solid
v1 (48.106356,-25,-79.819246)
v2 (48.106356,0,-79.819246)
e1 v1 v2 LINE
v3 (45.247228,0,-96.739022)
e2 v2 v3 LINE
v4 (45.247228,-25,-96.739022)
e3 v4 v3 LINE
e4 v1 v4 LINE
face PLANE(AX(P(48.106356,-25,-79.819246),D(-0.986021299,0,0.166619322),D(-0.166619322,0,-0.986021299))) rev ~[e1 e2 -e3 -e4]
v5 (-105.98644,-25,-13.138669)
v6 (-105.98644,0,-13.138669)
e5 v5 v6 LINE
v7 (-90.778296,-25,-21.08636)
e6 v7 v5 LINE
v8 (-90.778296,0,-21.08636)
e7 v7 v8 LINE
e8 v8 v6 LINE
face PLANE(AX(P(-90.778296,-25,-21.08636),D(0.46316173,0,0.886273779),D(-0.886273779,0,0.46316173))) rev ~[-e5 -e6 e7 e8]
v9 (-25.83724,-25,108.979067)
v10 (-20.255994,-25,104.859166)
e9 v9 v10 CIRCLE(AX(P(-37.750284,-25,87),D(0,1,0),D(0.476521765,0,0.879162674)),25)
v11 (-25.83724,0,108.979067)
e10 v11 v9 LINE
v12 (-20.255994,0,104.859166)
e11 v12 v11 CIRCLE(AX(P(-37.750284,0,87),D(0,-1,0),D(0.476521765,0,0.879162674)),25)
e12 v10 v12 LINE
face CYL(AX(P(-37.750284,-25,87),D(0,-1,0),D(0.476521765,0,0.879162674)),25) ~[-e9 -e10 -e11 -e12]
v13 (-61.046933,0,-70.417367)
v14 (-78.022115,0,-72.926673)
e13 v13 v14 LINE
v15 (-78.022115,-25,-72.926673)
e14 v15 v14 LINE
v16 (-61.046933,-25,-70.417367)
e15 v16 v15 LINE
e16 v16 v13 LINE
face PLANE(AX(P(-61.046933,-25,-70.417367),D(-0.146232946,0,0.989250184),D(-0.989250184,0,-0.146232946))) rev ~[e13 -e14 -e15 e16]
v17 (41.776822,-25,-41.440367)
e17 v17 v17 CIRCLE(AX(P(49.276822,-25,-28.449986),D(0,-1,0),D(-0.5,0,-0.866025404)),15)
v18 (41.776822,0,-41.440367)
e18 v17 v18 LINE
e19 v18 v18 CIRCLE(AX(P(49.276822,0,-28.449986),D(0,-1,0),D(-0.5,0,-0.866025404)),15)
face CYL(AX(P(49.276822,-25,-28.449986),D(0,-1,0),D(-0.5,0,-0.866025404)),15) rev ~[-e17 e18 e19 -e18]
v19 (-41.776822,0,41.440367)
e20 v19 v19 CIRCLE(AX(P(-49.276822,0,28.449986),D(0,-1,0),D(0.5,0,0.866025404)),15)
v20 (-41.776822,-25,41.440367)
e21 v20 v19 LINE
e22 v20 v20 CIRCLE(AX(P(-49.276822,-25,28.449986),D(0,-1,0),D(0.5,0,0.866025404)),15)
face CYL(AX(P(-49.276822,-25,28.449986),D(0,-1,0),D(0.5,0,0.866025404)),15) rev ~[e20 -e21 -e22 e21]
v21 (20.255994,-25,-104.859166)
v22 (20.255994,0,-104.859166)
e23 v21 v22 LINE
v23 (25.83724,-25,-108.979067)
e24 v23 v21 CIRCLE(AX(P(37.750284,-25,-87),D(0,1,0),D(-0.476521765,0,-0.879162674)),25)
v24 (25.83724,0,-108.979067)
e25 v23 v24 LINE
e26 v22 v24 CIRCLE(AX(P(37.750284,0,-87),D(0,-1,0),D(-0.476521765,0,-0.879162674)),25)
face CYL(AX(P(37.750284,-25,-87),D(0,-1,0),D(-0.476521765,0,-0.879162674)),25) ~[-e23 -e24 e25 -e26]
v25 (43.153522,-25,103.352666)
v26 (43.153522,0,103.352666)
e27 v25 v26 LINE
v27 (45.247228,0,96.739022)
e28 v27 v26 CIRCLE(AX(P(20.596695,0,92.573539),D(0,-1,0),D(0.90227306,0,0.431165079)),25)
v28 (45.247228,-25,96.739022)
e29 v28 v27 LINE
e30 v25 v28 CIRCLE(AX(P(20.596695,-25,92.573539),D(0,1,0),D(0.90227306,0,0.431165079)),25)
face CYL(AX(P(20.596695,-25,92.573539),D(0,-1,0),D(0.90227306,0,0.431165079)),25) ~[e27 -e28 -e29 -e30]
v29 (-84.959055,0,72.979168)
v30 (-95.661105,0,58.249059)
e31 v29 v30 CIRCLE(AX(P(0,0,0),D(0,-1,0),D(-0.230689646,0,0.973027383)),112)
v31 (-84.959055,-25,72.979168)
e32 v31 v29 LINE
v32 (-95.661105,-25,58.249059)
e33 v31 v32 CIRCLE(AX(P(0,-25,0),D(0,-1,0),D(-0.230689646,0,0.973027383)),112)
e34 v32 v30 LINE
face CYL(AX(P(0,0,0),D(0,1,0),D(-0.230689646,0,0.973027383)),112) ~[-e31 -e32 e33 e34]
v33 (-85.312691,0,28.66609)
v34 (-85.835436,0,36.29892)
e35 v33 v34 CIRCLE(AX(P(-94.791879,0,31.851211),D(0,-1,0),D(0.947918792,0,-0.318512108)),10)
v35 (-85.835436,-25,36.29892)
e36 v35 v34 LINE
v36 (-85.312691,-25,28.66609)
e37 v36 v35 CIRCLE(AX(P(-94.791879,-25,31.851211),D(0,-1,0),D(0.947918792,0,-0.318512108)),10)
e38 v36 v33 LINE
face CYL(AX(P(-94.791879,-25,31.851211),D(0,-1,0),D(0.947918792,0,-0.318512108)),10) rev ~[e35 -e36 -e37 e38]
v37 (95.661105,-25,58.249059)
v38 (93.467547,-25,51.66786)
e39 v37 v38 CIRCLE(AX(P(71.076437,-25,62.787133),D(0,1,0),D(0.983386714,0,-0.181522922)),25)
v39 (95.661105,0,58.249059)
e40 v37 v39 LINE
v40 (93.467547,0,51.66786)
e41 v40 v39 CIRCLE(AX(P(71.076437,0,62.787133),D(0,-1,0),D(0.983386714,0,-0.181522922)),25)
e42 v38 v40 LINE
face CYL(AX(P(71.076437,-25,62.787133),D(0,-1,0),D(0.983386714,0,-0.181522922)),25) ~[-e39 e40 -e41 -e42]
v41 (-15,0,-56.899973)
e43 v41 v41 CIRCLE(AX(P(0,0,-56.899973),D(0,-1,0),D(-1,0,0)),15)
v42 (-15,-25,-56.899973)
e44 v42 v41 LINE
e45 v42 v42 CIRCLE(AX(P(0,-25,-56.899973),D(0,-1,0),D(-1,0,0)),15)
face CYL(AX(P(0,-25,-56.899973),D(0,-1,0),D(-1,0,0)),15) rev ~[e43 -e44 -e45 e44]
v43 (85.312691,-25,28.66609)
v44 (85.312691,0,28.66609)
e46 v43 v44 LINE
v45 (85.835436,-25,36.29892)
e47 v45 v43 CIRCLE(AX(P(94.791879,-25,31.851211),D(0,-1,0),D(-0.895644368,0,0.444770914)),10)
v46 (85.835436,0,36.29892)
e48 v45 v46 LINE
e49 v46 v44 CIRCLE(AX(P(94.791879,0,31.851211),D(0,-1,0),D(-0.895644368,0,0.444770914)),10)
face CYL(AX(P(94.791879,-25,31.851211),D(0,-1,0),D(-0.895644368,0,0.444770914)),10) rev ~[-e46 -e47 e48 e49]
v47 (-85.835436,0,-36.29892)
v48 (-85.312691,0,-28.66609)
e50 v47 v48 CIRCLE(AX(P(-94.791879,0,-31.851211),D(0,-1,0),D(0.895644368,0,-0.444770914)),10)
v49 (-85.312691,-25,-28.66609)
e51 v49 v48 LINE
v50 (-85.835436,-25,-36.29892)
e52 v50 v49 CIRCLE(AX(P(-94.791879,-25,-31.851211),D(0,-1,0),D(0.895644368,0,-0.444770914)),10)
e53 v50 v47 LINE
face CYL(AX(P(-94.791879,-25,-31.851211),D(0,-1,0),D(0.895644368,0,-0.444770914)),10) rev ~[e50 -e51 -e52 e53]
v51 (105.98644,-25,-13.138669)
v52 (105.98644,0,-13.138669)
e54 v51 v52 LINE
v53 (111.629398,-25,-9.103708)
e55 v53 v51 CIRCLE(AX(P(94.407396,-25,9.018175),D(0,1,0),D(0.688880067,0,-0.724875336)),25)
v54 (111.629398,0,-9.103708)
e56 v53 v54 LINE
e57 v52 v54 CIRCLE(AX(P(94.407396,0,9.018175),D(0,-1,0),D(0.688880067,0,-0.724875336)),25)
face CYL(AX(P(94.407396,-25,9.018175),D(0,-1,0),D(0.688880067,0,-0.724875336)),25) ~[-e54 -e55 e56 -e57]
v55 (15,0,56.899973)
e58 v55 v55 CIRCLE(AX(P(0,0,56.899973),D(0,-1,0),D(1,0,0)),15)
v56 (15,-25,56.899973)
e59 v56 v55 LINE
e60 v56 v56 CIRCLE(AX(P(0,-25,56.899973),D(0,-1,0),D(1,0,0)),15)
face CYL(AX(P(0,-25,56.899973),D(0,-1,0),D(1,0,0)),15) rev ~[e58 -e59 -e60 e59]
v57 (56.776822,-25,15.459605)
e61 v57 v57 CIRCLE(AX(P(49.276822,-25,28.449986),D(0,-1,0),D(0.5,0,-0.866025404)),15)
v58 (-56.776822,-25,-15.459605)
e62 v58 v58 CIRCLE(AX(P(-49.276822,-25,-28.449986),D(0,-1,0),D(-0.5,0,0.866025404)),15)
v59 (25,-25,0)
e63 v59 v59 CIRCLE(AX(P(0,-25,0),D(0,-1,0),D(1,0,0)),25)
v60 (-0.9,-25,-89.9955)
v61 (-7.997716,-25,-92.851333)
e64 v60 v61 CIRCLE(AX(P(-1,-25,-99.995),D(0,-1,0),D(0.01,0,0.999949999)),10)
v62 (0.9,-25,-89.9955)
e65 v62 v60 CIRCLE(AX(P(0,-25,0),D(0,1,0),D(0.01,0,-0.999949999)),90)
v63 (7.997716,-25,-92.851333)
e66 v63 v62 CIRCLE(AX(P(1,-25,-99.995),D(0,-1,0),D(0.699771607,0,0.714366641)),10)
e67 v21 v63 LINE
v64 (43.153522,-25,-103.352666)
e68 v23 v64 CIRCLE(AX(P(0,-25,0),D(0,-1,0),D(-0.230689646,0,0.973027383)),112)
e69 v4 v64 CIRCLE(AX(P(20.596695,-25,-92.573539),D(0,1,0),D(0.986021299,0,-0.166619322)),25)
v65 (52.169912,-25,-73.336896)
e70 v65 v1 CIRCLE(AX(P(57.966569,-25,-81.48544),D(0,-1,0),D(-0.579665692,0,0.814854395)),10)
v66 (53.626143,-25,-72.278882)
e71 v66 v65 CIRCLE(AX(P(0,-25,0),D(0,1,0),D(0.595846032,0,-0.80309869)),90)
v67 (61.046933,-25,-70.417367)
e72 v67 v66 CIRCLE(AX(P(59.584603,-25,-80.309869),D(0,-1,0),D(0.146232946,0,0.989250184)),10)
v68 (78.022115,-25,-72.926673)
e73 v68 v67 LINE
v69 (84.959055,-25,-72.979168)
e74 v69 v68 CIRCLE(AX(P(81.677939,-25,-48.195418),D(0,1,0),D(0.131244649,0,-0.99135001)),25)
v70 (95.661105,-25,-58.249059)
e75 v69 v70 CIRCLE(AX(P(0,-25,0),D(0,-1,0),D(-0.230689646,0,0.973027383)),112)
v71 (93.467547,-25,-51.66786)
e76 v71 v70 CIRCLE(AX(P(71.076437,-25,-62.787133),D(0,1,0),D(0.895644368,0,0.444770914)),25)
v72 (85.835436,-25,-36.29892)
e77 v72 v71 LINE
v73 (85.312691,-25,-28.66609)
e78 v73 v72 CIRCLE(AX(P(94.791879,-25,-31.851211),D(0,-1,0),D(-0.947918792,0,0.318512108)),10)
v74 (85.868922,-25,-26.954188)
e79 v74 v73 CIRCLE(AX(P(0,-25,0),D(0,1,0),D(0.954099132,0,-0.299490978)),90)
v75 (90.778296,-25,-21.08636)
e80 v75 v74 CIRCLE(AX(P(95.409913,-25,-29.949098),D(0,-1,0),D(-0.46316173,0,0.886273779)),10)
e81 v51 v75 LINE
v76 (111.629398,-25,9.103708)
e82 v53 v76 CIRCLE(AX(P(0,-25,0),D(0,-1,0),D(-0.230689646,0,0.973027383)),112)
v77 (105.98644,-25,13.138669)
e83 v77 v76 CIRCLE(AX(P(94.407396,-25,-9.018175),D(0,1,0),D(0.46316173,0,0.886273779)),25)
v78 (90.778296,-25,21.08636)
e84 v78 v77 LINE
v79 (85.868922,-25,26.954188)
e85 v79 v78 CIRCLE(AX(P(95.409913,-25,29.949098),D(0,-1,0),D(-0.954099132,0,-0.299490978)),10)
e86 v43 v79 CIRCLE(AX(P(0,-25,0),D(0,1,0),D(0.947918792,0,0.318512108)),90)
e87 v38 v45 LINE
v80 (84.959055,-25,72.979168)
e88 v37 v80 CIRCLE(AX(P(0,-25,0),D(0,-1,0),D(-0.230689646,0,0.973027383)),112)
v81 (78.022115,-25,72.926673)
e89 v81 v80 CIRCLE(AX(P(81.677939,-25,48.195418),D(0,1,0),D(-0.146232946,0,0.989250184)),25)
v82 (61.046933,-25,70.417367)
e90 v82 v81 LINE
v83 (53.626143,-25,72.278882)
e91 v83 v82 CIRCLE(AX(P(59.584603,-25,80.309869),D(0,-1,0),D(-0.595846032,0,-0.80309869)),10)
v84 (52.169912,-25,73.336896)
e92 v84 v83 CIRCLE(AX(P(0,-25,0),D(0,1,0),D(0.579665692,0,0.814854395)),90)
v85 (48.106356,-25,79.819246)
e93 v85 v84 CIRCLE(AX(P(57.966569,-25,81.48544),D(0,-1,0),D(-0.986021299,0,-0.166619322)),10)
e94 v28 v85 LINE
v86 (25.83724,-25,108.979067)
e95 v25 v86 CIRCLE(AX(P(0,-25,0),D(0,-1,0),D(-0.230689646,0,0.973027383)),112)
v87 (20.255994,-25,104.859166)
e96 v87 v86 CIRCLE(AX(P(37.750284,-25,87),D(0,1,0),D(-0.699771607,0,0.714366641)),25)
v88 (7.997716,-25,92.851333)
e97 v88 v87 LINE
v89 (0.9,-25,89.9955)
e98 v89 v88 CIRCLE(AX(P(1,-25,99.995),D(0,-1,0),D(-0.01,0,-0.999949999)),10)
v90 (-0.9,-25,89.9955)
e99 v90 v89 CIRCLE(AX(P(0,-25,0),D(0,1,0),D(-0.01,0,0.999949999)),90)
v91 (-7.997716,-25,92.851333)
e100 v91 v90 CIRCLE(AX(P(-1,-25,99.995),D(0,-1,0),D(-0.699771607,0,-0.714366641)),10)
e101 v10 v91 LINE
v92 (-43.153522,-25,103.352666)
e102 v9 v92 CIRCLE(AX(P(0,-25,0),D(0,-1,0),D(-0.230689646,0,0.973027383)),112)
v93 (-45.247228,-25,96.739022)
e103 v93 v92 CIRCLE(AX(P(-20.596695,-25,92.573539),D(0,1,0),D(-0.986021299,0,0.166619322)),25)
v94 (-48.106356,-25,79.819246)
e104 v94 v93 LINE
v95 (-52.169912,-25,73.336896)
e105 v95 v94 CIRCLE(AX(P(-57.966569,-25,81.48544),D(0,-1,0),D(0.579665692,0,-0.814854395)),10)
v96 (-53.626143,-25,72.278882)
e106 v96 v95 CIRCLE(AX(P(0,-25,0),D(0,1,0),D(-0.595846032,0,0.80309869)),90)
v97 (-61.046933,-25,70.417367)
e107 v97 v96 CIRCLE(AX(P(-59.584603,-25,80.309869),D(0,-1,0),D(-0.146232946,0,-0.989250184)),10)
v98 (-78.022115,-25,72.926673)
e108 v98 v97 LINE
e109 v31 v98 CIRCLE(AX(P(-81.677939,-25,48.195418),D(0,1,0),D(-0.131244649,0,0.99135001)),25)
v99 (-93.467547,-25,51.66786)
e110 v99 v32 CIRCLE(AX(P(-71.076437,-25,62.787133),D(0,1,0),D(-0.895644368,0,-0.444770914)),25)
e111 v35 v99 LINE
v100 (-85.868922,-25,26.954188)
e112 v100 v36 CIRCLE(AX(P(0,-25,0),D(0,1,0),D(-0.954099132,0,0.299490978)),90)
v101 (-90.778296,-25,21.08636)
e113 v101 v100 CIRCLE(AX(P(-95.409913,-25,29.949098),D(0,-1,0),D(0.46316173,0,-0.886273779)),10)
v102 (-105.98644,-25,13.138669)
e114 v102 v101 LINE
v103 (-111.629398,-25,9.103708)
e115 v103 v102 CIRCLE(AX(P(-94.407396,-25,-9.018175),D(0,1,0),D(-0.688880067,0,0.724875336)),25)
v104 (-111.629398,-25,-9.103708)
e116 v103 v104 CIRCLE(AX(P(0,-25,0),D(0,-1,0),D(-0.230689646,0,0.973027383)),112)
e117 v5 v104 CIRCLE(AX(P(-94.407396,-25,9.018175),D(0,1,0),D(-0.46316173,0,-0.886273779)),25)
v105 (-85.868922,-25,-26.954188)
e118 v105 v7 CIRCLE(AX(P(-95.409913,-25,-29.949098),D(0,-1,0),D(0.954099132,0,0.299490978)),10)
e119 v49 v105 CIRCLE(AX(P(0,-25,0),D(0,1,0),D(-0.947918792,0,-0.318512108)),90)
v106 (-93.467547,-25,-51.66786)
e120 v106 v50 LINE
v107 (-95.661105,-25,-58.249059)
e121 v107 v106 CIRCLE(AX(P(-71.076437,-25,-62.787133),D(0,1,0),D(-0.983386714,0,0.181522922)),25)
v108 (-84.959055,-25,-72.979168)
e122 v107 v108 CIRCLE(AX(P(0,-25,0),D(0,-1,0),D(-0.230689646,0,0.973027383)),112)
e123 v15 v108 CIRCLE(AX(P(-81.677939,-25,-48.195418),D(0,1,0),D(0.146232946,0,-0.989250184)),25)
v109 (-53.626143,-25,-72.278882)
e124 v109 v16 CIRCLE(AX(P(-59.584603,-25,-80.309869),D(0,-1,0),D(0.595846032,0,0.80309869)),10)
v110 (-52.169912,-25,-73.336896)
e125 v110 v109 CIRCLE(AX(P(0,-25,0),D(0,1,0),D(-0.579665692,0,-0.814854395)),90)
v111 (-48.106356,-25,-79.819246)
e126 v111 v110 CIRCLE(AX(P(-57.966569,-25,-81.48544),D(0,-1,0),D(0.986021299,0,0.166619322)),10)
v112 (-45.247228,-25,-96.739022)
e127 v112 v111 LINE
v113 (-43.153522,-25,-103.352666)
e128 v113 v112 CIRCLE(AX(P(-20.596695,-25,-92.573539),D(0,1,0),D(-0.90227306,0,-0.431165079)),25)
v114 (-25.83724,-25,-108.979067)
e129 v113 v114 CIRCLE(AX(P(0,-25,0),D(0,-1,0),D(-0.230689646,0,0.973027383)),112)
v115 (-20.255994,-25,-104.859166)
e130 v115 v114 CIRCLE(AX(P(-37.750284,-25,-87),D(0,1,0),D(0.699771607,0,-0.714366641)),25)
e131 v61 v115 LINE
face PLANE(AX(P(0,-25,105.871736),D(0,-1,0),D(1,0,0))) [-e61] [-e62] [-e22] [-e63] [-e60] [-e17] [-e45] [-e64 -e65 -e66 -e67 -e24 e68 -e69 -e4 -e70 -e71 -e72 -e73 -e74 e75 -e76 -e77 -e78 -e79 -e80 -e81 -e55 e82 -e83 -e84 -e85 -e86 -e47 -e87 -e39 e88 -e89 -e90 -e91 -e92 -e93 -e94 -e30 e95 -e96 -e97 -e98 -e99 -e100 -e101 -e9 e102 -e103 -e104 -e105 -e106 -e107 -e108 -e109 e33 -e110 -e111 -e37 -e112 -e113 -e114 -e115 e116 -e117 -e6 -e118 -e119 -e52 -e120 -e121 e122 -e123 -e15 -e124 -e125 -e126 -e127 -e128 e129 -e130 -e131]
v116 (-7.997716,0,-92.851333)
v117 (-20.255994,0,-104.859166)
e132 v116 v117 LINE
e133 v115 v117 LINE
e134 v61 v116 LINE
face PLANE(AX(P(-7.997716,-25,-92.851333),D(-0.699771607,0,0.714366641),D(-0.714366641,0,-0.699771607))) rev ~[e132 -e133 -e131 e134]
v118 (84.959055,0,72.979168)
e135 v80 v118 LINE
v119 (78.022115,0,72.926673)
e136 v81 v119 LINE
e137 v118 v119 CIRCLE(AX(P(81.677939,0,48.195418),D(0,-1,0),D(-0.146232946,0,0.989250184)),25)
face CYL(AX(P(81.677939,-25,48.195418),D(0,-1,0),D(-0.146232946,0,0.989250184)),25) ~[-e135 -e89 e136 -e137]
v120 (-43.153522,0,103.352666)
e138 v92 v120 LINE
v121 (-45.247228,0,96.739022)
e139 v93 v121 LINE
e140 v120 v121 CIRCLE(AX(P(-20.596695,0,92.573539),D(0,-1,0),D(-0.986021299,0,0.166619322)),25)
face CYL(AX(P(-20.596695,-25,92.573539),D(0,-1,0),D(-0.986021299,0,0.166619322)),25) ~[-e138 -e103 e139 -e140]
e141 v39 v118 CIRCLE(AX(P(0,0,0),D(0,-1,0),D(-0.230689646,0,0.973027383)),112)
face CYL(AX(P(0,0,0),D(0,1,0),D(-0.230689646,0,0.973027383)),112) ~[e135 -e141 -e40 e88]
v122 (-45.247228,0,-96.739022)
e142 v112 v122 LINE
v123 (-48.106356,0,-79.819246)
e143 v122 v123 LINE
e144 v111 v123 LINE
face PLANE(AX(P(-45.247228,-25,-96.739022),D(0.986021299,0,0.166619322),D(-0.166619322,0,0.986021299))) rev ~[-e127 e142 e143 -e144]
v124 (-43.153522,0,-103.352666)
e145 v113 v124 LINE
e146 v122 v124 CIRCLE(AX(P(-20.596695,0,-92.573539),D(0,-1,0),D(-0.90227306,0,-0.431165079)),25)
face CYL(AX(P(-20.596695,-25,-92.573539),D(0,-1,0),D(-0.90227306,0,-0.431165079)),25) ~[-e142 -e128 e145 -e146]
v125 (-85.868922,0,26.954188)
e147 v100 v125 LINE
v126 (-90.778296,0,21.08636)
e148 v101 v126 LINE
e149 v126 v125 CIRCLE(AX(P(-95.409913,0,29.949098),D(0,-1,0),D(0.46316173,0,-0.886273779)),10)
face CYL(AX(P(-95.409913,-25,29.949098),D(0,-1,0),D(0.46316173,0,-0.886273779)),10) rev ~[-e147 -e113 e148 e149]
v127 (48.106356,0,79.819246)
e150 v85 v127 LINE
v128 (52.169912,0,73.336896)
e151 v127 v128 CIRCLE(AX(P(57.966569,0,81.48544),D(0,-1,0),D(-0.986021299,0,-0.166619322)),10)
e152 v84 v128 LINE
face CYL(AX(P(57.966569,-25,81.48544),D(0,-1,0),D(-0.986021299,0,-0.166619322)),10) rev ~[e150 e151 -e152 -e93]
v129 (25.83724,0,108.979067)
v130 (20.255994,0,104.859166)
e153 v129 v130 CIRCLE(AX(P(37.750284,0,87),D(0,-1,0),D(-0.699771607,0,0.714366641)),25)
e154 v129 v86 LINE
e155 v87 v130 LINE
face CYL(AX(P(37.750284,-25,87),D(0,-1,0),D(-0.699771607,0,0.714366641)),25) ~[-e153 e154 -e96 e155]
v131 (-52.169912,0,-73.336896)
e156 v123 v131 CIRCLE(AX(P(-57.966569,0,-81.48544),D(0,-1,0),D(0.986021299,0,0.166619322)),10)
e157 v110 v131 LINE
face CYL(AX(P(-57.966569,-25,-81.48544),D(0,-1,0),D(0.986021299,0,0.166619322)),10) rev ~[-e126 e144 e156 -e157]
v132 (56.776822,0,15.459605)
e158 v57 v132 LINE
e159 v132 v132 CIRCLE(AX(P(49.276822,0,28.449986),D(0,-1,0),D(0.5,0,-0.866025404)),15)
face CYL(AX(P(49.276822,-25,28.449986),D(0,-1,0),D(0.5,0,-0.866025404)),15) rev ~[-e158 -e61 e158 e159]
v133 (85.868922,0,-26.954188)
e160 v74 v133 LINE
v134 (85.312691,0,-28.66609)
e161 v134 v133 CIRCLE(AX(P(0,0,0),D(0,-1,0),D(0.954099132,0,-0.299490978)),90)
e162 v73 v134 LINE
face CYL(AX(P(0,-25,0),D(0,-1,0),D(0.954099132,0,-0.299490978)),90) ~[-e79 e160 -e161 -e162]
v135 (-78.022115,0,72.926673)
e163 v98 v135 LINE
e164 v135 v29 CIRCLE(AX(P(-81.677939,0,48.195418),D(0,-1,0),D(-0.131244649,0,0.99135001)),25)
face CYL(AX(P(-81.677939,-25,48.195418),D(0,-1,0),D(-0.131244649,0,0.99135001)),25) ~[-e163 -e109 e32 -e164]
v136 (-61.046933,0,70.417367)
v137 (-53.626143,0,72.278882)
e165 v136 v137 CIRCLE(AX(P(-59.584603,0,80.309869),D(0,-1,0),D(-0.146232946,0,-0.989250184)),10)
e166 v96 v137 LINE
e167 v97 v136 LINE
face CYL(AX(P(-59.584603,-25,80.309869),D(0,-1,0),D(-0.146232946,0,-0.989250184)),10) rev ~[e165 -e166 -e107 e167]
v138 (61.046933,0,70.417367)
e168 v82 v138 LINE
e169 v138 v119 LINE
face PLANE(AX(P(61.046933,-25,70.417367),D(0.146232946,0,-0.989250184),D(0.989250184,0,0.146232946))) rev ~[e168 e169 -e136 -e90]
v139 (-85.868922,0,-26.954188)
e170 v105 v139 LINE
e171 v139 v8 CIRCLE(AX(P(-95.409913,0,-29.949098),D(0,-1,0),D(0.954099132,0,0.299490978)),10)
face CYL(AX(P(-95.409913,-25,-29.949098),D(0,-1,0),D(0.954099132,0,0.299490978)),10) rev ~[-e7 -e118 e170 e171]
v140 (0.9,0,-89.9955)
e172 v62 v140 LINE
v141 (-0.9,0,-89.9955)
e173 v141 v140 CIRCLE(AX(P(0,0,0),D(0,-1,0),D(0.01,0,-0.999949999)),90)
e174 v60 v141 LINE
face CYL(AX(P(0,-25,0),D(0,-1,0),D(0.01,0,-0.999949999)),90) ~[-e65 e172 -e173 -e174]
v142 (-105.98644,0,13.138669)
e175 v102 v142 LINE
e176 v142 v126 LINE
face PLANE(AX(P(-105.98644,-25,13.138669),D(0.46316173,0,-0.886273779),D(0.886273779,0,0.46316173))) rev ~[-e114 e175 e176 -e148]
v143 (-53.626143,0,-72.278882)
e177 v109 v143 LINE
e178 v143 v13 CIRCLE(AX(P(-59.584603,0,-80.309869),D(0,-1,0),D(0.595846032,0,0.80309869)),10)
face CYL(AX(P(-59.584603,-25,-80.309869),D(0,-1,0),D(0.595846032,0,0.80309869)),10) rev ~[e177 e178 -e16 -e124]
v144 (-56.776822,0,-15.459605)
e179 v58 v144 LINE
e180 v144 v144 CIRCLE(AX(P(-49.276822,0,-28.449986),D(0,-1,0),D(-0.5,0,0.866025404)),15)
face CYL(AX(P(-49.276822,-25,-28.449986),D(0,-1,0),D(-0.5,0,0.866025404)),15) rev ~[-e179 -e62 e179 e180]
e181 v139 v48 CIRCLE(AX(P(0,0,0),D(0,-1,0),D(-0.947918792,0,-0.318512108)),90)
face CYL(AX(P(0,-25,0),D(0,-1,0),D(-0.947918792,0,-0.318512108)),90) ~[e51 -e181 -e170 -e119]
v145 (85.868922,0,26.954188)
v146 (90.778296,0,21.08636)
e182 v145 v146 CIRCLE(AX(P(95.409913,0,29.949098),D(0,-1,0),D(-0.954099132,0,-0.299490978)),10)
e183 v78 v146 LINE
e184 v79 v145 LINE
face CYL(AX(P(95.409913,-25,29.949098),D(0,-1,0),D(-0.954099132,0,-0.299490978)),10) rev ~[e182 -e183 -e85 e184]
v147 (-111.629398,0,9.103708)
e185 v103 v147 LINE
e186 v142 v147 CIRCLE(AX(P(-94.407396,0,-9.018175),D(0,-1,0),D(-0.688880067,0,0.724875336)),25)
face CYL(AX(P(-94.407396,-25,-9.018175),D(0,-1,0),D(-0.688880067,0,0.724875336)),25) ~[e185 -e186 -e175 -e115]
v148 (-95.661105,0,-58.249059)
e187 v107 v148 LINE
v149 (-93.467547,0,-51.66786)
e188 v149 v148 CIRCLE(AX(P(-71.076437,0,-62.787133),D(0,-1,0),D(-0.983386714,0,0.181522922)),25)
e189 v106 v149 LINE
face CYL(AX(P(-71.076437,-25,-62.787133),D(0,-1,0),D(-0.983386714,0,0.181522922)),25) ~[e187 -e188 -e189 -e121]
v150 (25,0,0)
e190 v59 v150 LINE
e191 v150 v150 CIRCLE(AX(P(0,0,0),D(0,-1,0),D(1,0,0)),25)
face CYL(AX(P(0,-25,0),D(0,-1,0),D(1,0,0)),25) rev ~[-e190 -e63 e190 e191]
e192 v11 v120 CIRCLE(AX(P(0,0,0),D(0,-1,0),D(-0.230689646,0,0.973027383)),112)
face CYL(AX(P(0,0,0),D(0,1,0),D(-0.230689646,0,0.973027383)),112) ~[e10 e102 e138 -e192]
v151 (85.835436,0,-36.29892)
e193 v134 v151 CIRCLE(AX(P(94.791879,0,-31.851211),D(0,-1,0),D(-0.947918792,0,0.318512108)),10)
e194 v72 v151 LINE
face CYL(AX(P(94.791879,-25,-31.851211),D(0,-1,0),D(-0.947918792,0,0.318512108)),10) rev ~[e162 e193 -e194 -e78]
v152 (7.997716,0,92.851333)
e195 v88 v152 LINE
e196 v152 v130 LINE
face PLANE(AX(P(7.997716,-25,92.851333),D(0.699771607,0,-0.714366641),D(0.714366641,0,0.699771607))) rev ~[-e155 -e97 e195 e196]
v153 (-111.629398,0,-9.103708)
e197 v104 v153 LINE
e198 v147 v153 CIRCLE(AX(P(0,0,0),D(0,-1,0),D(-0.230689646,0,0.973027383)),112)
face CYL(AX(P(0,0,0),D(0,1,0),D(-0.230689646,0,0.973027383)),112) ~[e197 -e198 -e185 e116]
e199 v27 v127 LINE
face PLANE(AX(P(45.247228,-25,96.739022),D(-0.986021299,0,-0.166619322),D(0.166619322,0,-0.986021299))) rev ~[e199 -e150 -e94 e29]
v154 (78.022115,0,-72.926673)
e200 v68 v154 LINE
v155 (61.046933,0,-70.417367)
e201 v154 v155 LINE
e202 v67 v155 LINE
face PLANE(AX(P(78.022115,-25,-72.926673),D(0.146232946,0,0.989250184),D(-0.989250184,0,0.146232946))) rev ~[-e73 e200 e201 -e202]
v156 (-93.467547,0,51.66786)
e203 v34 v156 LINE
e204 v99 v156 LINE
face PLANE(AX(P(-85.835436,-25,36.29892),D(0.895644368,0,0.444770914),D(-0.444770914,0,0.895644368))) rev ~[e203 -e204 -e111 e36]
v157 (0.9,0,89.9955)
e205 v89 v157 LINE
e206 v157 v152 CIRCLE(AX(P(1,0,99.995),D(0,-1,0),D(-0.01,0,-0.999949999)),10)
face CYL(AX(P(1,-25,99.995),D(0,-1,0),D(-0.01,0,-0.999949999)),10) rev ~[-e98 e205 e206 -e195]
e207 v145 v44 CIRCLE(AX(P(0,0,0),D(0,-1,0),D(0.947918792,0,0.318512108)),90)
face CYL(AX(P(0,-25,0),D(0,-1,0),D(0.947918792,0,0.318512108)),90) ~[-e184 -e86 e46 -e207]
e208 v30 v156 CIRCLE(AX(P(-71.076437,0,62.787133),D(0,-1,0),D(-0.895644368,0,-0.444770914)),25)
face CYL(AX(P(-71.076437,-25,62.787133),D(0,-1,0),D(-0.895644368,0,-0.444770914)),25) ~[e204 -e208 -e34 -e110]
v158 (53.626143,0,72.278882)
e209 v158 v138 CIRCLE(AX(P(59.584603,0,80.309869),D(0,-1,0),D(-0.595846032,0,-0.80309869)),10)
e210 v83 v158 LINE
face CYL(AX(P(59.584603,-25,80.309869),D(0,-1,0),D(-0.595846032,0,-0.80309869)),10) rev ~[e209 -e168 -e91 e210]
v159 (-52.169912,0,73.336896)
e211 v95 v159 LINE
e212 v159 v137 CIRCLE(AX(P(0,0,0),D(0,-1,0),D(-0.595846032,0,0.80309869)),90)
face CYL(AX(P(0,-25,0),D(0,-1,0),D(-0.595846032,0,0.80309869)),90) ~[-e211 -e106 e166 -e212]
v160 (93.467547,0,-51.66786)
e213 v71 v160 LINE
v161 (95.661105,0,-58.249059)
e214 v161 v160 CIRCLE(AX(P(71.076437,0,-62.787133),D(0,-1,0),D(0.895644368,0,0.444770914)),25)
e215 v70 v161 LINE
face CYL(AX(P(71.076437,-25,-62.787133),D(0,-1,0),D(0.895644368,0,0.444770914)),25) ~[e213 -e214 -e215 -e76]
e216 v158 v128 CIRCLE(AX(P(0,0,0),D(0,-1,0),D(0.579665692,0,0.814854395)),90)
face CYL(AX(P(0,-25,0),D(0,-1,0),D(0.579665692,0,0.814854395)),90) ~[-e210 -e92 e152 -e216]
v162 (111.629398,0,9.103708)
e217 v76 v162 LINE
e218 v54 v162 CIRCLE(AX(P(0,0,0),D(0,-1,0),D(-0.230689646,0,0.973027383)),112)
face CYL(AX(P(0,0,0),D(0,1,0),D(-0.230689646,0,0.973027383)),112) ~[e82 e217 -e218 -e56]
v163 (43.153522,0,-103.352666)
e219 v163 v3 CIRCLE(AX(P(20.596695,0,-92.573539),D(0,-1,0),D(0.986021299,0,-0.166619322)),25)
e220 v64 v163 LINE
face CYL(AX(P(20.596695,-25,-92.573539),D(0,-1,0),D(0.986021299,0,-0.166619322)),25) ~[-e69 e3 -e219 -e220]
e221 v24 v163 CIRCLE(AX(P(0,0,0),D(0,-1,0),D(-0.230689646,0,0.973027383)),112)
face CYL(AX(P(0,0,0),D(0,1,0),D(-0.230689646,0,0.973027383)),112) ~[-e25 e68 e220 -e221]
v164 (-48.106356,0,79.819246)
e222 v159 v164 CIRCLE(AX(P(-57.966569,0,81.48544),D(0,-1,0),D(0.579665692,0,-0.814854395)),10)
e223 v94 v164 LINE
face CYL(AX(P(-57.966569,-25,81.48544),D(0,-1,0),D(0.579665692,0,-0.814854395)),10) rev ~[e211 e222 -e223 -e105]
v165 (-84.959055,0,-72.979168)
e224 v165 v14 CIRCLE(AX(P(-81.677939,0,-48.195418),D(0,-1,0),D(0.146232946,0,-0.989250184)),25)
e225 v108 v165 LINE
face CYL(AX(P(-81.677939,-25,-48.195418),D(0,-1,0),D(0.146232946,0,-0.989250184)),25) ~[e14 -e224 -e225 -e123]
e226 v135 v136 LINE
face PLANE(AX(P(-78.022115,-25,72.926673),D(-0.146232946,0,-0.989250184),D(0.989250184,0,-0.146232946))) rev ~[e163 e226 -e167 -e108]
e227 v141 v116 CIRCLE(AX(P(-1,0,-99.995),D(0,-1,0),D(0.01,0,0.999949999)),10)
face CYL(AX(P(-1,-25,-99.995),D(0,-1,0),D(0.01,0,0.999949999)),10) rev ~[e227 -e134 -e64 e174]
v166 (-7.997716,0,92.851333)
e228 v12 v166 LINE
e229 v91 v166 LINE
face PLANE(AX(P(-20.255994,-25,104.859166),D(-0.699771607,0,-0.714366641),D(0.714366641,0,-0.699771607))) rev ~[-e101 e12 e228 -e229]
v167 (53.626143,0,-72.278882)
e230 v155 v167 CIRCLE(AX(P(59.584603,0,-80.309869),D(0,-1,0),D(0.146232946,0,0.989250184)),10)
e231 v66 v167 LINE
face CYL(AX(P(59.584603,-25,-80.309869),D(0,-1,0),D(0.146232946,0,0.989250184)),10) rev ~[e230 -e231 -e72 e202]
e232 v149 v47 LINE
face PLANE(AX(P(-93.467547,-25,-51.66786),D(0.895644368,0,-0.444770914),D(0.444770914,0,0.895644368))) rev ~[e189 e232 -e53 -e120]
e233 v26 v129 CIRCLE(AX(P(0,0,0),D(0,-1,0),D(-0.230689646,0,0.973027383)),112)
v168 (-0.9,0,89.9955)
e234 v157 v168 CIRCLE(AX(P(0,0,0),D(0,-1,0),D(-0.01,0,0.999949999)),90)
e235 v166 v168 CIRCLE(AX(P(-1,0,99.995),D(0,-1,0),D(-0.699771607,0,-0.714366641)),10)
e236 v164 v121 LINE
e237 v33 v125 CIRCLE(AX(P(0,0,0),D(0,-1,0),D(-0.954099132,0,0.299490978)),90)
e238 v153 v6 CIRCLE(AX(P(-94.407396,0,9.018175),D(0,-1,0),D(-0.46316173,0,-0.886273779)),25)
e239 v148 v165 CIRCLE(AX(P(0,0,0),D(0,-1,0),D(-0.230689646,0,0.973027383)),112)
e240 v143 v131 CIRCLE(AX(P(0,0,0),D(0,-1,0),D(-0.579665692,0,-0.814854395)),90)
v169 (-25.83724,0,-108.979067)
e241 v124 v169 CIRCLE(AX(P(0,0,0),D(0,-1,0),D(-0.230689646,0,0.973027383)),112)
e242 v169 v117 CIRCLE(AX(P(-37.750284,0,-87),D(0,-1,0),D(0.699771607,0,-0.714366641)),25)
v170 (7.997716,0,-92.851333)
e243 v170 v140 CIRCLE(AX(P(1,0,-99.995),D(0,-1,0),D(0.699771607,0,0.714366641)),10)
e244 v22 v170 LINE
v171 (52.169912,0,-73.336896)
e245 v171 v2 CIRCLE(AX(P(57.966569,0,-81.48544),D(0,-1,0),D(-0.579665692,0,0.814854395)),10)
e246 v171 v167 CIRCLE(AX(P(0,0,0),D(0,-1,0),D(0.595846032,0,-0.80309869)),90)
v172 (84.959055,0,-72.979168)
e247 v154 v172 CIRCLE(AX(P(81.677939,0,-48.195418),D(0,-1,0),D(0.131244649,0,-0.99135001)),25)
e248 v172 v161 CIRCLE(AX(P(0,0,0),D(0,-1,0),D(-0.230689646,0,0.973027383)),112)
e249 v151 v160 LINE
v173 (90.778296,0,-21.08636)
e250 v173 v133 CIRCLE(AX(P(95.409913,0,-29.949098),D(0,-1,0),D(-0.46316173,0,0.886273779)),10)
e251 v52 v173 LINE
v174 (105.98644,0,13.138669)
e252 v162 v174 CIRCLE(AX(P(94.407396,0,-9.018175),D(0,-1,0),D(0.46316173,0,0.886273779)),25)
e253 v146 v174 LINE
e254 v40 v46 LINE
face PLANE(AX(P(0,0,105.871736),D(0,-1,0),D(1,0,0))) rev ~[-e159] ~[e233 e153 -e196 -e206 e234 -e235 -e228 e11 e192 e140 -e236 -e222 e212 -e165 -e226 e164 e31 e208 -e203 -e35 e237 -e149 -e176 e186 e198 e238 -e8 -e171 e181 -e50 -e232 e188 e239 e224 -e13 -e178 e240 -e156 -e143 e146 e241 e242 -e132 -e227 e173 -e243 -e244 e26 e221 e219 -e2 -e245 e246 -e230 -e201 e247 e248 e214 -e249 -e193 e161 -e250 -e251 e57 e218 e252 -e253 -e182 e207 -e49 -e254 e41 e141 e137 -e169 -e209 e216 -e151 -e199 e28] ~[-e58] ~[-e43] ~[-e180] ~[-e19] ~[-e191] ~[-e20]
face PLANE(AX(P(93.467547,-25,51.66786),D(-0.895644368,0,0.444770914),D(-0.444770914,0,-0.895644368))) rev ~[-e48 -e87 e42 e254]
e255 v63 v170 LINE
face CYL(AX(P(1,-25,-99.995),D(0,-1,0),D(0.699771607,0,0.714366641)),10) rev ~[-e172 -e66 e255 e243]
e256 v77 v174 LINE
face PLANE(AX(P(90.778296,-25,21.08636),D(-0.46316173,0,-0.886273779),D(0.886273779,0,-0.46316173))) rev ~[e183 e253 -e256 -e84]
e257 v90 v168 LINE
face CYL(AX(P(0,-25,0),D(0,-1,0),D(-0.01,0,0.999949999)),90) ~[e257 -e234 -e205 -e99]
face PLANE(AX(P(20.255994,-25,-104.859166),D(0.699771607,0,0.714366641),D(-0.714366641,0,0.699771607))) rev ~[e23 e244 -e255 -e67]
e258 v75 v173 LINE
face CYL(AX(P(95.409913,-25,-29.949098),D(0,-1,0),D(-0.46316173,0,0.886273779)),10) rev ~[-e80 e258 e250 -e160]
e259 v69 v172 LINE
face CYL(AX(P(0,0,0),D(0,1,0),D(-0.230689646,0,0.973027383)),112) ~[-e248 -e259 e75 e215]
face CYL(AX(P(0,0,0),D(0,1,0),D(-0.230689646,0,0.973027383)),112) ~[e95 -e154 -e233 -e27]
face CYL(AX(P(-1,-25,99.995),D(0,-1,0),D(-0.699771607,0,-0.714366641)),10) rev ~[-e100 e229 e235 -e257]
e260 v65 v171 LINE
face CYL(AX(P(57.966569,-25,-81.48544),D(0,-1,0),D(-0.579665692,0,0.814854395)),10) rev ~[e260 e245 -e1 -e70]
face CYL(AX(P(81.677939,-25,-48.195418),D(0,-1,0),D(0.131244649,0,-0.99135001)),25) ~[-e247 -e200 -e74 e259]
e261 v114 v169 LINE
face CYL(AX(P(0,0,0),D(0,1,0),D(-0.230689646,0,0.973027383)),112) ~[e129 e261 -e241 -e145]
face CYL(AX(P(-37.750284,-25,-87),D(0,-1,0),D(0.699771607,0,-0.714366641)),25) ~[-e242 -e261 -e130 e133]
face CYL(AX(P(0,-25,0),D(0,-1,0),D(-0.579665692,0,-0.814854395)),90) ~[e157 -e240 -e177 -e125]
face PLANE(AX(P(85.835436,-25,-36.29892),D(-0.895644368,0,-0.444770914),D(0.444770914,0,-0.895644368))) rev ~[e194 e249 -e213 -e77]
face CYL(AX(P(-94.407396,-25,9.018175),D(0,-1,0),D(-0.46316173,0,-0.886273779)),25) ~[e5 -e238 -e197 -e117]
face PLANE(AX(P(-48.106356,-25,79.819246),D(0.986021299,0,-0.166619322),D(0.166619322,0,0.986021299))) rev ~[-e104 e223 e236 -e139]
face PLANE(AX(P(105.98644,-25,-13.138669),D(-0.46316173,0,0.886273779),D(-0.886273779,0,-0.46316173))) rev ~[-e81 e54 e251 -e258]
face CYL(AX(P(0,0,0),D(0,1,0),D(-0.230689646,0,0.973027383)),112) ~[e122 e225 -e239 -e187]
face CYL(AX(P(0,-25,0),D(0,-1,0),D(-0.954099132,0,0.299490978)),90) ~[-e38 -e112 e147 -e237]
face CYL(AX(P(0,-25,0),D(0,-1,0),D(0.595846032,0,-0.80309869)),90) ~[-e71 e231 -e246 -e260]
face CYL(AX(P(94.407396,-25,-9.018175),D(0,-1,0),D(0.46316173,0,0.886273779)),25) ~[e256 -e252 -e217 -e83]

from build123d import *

# Parameters (mm, degrees)
F1_DEPTH        = 25
F3_DEPTH        = 25.001
F3_COPIES_COUNT = 10
F4_R            = 25
F5_DEPTH        = 25.001
F6_R            = 15
F7_DEPTH        = 25.001
F7_COPIES_COUNT = 6


# Not quite as in the source:
# - a pattern or mirror of a feature is missing from the dataset's text; its kind, count and spacing are read off the source's solid


with BuildPart() as f1:
    # F0 (on Front) → F1 (new body)
    with BuildSketch(Plane.XZ):
        with BuildLine():
            Line((-8.9100863455, 98.6570205686), (0, 100))
            Line((0, 100), (13.2558165823, 98.002007127))
            Line((13.2558165823, 98.002007127), (20.2559942473, 104.8591660301))
            ThreePointArc((20.2559942473, 104.8591660301), (22.9030212669, 107.1136465319), (25.8372403083, 108.979066858))
            ThreePointArc((25.8372403083, 108.979066858), (0, 112), (-25.8372403083, 108.979066858))
            ThreePointArc((-25.8372403083, 108.979066858), (-22.9030212669, 107.1136465319), (-20.2559942473, 104.8591660301))
            Line((-20.2559942473, 104.8591660301), (-13.2558165823, 98.002007127))
            Line((-13.2558165823, 98.002007127), (-8.9100863455, 98.6570205686))
        make_face()
        with BuildLine():
            Line((20.2559942473, 104.8591660301), (13.2558165823, 98.002007127))
            Line((13.2558165823, 98.002007127), (29.4755174411, 95.5572805786))
            Line((29.4755174411, 95.5572805786), (56.3320058064, 82.6238774316))
            Line((56.3320058064, 82.6238774316), (78.1831482468, 62.3489801859))
            Line((78.1831482468, 62.3489801859), (93.0873748644, 36.5341024366))
            Line((93.0873748644, 36.5341024366), (99.7203797181, 7.4730093586))
            Line((99.7203797181, 7.4730093586), (97.4927912182, -22.2520933956))
            Line((97.4927912182, -22.2520933956), (86.6025403784, -50))
            Line((86.6025403784, -50), (68.0172737771, -73.305187183))
            Line((68.0172737771, -73.305187183), (43.3883739118, -90.0968867902))
            Line((43.3883739118, -90.0968867902), (14.9042266176, -98.8830826225))
            Line((14.9042266176, -98.8830826225), (-14.9042266176, -98.8830826225))
            Line((-14.9042266176, -98.8830826225), (-43.3883739118, -90.0968867902))
            Line((-43.3883739118, -90.0968867902), (-68.0172737771, -73.305187183))
            Line((-68.0172737771, -73.305187183), (-86.6025403784, -50))
            Line((-86.6025403784, -50), (-97.4927912182, -22.2520933956))
            Line((-97.4927912182, -22.2520933956), (-99.7203797181, 7.4730093586))
            Line((-99.7203797181, 7.4730093586), (-93.0873748644, 36.5341024366))
            Line((-93.0873748644, 36.5341024366), (-78.1831482468, 62.3489801859))
            Line((-78.1831482468, 62.3489801859), (-56.3320058064, 82.6238774316))
            Line((-56.3320058064, 82.6238774316), (-29.4755174411, 95.5572805786))
            Line((-29.4755174411, 95.5572805786), (-13.2558165823, 98.002007127))
            Line((-13.2558165823, 98.002007127), (-20.2559942473, 104.8591660301))
            ThreePointArc((-20.2559942473, 104.8591660301), (-22.9030212669, 107.1136465319), (-25.8372403083, 108.979066858))
            ThreePointArc((-25.8372403083, 108.979066858), (-69.463044439, -87.857187852), (112, 0))
            ThreePointArc((112, 0), (87.857187852, 69.463044439), (25.8372403083, 108.979066858))
            ThreePointArc((25.8372403083, 108.979066858), (22.9030212669, 107.1136465319), (20.2559942473, 104.8591660301))
        make_face()
        with BuildLine():
            ThreePointArc((90, 0), (63.957016816, 63.3206127576), (0.9, 89.9954998875))
            ThreePointArc((0.9, 89.9954998875), (0, 90), (-0.9, 89.9954998875))
            ThreePointArc((-0.9, 89.9954998875), (-63.3206127576, -63.957016816), (90, 0))
        make_face()
        with BuildLine():
            Line((29.4755174411, 95.5572805786), (13.2558165823, 98.002007127))
            Line((13.2558165823, 98.002007127), (7.9977160698, 92.851333463))
            ThreePointArc((7.9977160698, 92.851333463), (4.7327694943, 90.7178003028), (0.9, 89.9954998875))
            ThreePointArc((0.9, 89.9954998875), (63.957016816, 63.3206127576), (90, 0))
            ThreePointArc((90, 0), (-63.3206127576, -63.957016816), (-0.9, 89.9954998875))
            ThreePointArc((-0.9, 89.9954998875), (-4.7327694943, 90.7178003028), (-7.9977160698, 92.851333463))
            Line((-7.9977160698, 92.851333463), (-13.2558165823, 98.002007127))
            Line((-13.2558165823, 98.002007127), (-29.4755174411, 95.5572805786))
            Line((-29.4755174411, 95.5572805786), (-56.3320058064, 82.6238774316))
            Line((-56.3320058064, 82.6238774316), (-78.1831482468, 62.3489801859))
            Line((-78.1831482468, 62.3489801859), (-93.0873748644, 36.5341024366))
            Line((-93.0873748644, 36.5341024366), (-99.7203797181, 7.4730093586))
            Line((-99.7203797181, 7.4730093586), (-97.4927912182, -22.2520933956))
            Line((-97.4927912182, -22.2520933956), (-86.6025403784, -50))
            Line((-86.6025403784, -50), (-68.0172737771, -73.305187183))
            Line((-68.0172737771, -73.305187183), (-43.3883739118, -90.0968867902))
            Line((-43.3883739118, -90.0968867902), (-14.9042266176, -98.8830826225))
            Line((-14.9042266176, -98.8830826225), (14.9042266176, -98.8830826225))
            Line((14.9042266176, -98.8830826225), (43.3883739118, -90.0968867902))
            Line((43.3883739118, -90.0968867902), (68.0172737771, -73.305187183))
            Line((68.0172737771, -73.305187183), (86.6025403784, -50))
            Line((86.6025403784, -50), (97.4927912182, -22.2520933956))
            Line((97.4927912182, -22.2520933956), (99.7203797181, 7.4730093586))
            Line((99.7203797181, 7.4730093586), (93.0873748644, 36.5341024366))
            Line((93.0873748644, 36.5341024366), (78.1831482468, 62.3489801859))
            Line((78.1831482468, 62.3489801859), (56.3320058064, 82.6238774316))
            Line((56.3320058064, 82.6238774316), (29.4755174411, 95.5572805786))
        make_face()
        with BuildLine():
            Line((13.2558165823, 98.002007127), (0, 100))
            Line((0, 100), (-8.9100863455, 98.6570205686))
            Line((-8.9100863455, 98.6570205686), (-13.2558165823, 98.002007127))
            Line((-13.2558165823, 98.002007127), (-7.9977160698, 92.851333463))
            ThreePointArc((-7.9977160698, 92.851333463), (-4.7327694943, 90.7178003028), (-0.9, 89.9954998875))
            ThreePointArc((-0.9, 89.9954998875), (0, 90), (0.9, 89.9954998875))
            ThreePointArc((0.9, 89.9954998875), (4.7327694943, 90.7178003028), (7.9977160698, 92.851333463))
            Line((7.9977160698, 92.851333463), (13.2558165823, 98.002007127))
        make_face()
    extrude(amount=F1_DEPTH)

    # F2 (on face) → F3 (cut, through all)
    with BuildSketch(Plane.XZ.offset(25)):
        with BuildLine():
            ThreePointArc((-25.8372403083, 108.979066858), (-22.9030212669, 107.1136465319), (-20.2559942473, 104.8591660301))
            Line((-20.2559942473, 104.8591660301), (-7.9977160698, 92.851333463))
            ThreePointArc((-7.9977160698, 92.851333463), (-4.7327694943, 90.7178003028), (-0.9, 89.9954998875))
            ThreePointArc((-0.9, 89.9954998875), (0, 90), (0.9, 89.9954998875))
            ThreePointArc((0.9, 89.9954998875), (4.7327694943, 90.7178003028), (7.9977160698, 92.851333463))
            Line((7.9977160698, 92.851333463), (20.2559942473, 104.8591660301))
            ThreePointArc((20.2559942473, 104.8591660301), (22.9030212669, 107.1136465319), (25.8372403083, 108.979066858))
            ThreePointArc((25.8372403083, 108.979066858), (0, 112), (-25.8372403083, 108.979066858))
        make_face()
    f3 = extrude(amount=-F3_DEPTH, mode=Mode.SUBTRACT)

    # F3_copies: F3 ×10 about axis
    f3_copies_axis = Axis((0, 0, 0), (0, 1, 0))
    for i in range(1, F3_COPIES_COUNT):
        add(f3.rotate(f3_copies_axis, i * 360 / F3_COPIES_COUNT), mode=Mode.SUBTRACT)

    # F4 (on face) → F5 (cut, through all)
    with BuildSketch(Plane.XZ.offset(25)):
        Circle(F4_R)
    extrude(amount=-F5_DEPTH, mode=Mode.SUBTRACT)

    # F6 (on face) → F7 (cut, through all)
    with BuildSketch(Plane.XZ.offset(25)):
        with Locations((0, 56.8999728613)):
            Circle(F6_R)
    f7 = extrude(amount=-F7_DEPTH, mode=Mode.SUBTRACT)

    # F7_copies: F7 ×6 about axis
    f7_copies_axis = Axis((0, 0, 0), (0, 1, 0))
    for i in range(1, F7_COPIES_COUNT):
        add(f7.rotate(f7_copies_axis, i * 360 / F7_COPIES_COUNT), mode=Mode.SUBTRACT)


solid = f1.part
